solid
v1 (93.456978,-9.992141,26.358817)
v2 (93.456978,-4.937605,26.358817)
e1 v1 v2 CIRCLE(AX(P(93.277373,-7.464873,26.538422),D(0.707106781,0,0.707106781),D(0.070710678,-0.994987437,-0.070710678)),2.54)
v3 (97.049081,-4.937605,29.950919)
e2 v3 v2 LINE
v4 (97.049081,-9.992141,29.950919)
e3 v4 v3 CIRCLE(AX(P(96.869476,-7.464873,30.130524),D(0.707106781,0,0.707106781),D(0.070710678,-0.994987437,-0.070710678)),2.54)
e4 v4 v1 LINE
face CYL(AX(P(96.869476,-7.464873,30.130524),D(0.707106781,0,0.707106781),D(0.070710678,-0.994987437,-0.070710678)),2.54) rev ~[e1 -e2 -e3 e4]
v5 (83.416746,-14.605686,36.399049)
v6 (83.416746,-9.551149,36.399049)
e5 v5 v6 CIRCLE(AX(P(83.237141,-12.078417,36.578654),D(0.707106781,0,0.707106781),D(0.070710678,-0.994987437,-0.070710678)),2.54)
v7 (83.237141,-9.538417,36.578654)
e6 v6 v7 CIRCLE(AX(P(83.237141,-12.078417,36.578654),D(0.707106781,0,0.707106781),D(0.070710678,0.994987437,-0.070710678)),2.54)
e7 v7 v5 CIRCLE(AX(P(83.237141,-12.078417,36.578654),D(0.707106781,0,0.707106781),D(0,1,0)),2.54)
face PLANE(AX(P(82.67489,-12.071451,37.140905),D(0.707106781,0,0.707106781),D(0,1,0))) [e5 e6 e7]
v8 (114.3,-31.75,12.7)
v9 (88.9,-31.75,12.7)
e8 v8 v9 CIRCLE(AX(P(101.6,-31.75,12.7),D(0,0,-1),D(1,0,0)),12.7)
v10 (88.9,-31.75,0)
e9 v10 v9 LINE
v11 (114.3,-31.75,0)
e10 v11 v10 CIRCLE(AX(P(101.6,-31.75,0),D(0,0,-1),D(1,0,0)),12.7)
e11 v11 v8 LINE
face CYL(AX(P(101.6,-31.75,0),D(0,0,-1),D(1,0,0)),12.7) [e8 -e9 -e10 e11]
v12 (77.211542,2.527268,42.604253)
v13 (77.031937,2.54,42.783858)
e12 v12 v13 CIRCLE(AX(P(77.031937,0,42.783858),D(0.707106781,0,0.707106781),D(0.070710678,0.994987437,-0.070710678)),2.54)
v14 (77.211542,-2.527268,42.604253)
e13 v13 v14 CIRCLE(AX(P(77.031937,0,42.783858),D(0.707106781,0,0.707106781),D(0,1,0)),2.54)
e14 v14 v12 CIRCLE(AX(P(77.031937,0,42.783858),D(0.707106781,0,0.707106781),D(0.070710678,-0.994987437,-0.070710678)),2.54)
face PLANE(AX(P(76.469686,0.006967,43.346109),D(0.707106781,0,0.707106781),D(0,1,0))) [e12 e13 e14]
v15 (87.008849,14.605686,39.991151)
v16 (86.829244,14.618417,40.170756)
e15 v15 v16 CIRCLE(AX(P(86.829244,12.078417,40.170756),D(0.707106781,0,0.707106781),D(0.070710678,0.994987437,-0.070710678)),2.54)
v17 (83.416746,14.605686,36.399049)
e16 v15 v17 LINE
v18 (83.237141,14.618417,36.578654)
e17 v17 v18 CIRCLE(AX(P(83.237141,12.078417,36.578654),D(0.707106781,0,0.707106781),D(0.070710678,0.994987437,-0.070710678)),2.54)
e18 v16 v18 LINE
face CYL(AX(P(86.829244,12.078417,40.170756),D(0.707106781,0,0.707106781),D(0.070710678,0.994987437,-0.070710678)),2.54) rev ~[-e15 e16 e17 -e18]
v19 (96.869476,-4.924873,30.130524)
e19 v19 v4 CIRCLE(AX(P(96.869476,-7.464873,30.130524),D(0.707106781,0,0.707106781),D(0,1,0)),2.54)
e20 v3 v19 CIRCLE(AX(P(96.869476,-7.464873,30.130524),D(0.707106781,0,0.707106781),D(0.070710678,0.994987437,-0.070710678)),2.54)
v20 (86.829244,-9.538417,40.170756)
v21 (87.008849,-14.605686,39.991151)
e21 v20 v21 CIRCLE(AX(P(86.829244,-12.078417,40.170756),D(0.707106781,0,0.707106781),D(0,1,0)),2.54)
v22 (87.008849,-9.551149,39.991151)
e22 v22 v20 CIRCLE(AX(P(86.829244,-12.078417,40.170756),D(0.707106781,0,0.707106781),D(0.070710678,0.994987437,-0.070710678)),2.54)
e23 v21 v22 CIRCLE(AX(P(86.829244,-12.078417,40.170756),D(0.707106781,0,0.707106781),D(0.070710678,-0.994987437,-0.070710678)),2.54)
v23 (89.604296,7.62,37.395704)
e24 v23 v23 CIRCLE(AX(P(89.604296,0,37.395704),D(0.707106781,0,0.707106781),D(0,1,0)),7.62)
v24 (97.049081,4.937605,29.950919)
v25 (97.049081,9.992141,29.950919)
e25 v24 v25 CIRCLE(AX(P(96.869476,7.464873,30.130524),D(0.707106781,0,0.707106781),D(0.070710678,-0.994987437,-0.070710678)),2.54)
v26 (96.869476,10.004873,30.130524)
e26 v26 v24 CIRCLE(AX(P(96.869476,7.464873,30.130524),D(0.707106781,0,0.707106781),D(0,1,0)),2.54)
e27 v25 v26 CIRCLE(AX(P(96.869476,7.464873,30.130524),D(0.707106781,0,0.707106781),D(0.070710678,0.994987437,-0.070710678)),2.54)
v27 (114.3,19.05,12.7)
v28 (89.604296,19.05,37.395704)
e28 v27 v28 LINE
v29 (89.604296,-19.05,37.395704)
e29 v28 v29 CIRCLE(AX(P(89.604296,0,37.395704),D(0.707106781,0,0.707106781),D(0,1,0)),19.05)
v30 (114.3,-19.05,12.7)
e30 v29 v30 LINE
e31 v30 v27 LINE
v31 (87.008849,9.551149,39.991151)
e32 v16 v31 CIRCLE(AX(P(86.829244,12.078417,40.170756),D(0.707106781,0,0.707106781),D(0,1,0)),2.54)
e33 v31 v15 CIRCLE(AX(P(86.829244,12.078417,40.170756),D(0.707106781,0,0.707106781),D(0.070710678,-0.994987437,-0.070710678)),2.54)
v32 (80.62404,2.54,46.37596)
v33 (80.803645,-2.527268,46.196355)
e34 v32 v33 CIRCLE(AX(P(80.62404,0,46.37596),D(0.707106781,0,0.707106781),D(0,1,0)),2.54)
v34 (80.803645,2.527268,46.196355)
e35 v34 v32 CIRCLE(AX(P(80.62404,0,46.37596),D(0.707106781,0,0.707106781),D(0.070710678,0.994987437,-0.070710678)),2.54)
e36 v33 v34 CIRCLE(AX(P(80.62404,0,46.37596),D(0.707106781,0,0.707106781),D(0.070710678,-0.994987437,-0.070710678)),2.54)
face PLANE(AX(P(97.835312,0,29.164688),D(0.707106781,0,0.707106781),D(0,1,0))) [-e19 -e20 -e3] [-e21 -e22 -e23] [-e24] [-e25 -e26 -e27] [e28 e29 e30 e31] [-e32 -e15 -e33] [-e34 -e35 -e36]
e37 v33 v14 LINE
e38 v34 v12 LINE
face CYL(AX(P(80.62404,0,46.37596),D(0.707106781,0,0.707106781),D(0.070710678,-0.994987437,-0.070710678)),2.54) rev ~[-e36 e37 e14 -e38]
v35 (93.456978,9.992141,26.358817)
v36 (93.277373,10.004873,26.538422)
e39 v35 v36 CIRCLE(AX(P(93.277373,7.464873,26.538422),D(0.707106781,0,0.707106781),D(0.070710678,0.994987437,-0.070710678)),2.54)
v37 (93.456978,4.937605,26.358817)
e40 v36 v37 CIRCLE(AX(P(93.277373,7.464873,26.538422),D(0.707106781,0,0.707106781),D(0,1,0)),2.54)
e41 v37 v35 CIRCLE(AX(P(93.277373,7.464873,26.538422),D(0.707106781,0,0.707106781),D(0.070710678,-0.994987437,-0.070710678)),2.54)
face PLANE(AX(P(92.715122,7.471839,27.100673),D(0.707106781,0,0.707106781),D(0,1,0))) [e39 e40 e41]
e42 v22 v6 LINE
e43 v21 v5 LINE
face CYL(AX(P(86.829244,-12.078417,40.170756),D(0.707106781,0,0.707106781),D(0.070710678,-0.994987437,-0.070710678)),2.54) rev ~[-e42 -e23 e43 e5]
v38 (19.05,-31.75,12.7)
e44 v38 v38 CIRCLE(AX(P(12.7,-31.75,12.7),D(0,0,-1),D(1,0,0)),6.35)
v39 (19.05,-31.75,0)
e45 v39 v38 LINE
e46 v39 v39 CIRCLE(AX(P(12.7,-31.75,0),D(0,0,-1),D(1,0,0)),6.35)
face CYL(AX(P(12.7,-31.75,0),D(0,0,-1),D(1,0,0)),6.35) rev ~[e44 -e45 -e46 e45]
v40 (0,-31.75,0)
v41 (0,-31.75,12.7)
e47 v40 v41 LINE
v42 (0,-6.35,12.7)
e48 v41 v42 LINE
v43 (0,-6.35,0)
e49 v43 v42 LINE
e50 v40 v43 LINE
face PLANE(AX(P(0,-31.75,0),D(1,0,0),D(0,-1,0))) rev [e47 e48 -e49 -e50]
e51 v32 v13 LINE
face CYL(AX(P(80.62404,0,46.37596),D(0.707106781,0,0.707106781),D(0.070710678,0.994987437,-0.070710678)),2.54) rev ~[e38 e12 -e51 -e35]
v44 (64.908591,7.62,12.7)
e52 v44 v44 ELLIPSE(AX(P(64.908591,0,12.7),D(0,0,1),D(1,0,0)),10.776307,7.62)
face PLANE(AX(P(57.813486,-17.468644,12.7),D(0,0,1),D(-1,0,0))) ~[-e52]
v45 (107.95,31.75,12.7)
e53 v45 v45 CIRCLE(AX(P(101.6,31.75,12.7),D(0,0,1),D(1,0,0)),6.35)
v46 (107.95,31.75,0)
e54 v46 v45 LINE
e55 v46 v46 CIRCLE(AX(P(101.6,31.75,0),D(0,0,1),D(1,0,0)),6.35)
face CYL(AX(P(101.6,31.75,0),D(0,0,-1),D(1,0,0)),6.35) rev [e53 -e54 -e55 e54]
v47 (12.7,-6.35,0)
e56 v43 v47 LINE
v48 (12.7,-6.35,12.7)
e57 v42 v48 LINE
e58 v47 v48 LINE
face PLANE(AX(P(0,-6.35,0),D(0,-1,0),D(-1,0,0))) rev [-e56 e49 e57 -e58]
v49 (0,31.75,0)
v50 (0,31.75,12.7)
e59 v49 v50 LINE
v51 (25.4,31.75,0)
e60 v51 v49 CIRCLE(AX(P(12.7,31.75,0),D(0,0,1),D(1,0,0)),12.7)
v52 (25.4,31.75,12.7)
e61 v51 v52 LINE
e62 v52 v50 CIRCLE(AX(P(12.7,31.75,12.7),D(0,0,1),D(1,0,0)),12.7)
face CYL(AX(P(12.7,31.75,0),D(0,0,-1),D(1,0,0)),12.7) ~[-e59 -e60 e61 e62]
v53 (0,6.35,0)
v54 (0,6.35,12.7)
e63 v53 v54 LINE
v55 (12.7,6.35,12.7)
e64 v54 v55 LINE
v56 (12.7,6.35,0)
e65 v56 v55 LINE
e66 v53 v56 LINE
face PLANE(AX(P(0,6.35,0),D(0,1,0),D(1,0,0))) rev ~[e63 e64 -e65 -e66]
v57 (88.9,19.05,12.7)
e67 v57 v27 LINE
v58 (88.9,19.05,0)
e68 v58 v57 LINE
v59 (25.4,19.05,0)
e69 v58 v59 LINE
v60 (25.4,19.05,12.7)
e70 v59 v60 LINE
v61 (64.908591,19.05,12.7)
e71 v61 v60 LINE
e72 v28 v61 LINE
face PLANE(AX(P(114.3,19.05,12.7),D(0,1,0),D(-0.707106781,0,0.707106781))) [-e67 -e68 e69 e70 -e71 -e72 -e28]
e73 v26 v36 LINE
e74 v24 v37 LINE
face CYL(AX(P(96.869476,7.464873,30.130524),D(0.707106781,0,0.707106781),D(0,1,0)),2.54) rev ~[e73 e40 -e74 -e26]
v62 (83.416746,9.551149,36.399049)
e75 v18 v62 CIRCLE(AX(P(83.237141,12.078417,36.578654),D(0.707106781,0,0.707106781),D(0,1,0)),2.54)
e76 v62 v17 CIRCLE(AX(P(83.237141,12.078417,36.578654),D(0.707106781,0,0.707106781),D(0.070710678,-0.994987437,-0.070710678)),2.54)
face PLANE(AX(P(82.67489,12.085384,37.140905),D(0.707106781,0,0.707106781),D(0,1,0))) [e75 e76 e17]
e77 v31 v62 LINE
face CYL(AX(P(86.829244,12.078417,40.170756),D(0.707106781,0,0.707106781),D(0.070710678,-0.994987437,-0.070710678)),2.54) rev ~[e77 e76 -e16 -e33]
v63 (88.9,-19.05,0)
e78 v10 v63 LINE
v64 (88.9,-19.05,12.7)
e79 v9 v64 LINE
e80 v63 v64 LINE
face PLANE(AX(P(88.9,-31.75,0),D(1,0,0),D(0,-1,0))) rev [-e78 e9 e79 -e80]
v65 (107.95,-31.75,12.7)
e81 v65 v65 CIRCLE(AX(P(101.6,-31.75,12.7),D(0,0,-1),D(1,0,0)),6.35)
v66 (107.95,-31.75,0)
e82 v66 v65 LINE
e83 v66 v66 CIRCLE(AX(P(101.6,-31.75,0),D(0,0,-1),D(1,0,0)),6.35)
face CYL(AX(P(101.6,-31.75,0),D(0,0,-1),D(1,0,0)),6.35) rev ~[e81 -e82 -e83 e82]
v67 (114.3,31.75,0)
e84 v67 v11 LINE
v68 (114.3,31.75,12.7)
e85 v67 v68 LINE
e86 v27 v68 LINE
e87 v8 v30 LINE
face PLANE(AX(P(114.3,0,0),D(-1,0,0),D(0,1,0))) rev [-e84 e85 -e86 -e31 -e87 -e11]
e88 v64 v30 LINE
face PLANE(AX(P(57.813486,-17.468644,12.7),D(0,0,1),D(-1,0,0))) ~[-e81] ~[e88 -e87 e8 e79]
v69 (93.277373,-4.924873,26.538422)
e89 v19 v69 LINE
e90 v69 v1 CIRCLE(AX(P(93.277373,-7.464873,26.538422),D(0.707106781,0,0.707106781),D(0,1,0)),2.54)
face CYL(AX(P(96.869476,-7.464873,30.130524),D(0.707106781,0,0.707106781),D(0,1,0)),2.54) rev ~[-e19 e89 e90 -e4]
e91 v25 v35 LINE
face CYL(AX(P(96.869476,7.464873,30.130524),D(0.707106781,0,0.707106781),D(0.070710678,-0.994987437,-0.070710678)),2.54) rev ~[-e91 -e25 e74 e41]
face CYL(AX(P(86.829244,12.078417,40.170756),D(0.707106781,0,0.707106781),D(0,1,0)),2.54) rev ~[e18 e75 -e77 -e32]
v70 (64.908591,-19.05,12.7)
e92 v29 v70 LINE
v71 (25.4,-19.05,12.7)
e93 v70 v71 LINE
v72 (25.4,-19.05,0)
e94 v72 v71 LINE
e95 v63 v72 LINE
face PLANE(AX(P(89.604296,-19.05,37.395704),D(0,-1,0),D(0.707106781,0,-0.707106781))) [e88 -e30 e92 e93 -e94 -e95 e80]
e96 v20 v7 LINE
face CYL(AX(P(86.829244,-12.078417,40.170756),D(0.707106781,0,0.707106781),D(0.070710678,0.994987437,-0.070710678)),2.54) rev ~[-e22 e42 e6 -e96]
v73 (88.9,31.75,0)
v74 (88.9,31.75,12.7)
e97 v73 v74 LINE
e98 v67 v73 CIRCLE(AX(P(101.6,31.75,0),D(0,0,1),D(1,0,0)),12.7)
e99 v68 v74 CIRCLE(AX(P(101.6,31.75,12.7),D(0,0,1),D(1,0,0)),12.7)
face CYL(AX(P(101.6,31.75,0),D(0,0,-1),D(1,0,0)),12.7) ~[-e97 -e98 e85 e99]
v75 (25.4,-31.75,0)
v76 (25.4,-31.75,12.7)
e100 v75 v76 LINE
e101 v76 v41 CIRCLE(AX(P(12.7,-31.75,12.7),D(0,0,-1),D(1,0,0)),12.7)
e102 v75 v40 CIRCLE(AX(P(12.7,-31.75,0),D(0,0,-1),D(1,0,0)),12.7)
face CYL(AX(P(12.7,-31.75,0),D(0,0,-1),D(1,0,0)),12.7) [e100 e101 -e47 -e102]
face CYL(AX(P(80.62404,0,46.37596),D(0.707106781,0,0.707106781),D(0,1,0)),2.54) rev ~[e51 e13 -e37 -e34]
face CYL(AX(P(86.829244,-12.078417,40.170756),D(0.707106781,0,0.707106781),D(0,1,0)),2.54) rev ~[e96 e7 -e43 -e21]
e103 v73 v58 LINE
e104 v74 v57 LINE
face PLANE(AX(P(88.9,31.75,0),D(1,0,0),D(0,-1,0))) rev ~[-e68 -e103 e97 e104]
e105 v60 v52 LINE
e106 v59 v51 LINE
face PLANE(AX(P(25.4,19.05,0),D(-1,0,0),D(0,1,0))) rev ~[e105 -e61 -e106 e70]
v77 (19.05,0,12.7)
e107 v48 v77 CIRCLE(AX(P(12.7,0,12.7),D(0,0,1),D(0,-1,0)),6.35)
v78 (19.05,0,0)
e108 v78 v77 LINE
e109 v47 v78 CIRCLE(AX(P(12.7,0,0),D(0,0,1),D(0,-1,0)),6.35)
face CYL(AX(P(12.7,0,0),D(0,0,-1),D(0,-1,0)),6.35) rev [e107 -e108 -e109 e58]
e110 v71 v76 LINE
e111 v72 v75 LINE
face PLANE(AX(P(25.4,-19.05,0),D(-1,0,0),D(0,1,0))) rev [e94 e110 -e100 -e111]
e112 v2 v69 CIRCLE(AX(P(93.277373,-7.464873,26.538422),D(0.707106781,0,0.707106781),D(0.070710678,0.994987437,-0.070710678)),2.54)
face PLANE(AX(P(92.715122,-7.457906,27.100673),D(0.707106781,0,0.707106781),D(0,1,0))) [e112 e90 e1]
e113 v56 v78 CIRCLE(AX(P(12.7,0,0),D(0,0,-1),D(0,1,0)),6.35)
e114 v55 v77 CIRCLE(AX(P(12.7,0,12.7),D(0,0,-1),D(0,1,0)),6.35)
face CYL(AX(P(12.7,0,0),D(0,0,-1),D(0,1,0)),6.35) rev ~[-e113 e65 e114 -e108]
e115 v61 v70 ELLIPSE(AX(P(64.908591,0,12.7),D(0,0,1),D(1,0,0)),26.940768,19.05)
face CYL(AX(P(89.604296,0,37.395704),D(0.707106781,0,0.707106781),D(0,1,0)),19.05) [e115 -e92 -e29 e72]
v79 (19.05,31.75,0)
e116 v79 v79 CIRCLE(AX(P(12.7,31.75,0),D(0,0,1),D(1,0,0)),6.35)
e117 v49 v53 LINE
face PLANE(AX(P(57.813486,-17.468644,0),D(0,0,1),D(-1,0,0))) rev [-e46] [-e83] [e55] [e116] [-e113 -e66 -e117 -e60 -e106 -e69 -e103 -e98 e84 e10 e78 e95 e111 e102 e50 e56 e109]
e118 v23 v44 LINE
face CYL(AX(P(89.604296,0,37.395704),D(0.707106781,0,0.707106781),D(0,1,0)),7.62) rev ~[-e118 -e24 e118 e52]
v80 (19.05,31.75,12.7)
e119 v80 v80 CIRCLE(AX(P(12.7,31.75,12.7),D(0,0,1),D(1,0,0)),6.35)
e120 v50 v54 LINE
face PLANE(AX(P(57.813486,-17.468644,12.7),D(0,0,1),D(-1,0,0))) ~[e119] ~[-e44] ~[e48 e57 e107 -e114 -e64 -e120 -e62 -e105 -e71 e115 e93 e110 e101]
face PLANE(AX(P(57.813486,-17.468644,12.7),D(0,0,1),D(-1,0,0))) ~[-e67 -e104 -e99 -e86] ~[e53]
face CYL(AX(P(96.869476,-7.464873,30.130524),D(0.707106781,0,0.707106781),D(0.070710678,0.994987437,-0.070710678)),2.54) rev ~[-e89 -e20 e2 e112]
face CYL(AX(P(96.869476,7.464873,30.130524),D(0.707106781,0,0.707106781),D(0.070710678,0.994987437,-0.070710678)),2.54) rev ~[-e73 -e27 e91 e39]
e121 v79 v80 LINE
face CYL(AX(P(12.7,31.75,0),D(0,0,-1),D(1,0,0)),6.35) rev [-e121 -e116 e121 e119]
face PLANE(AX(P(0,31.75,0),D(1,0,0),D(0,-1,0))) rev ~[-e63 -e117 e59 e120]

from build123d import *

# Parameters (mm, degrees)
F0_R             = 6.35
F1_DEPTH         = 12.7
F4_R             = 7.62
F6_DEPTH         = 5.08
F6_COPIES_COUNT  = 2
F6_COPIES_PITCH  = 14.929745
F6_COPIES1_COUNT = 2
F6_COPIES1_PITCH = 14.929745
F6_COPIES2_COUNT = 2
F6_COPIES2_PITCH = 24.156836
F6_COPIES3_COUNT = 2
F6_COPIES3_PITCH = 24.156836


# Not quite as in the source:
# - a pattern or mirror of a feature is missing from the dataset's text; its kind, count and spacing are read off the source's solid


with BuildPart() as f1:
    # F0 (on Top) → F1 (new body)
    with BuildSketch(Plane.XY):
        with BuildLine():
            Line((0, 31.75), (0, 6.35))
            Line((0, 6.35), (12.7, 6.35))
            ThreePointArc((12.7, 6.35), (17.1901280605, 4.4901280605), (19.05, 0))
            Line((19.05, 0), (114.3, 0))
            Line((114.3, 0), (114.3, 31.75))
            ThreePointArc((114.3, 31.75), (101.6, 44.45), (88.9, 31.75))
            Line((88.9, 31.75), (88.9, 19.05))
            Line((88.9, 19.05), (25.4, 19.05))
            Line((25.4, 19.05), (25.4, 31.75))
            ThreePointArc((25.4, 31.75), (12.7, 44.45), (0, 31.75))
        make_face()
        with Locations((12.7, 31.75)):
            Circle(F0_R, mode=Mode.SUBTRACT)
        with Locations((101.6, 31.75)):
            Circle(F0_R, mode=Mode.SUBTRACT)
    extrude(amount=F1_DEPTH)

    # F2: F1 across plane


with BuildPart() as f1_1:
    add(f1.part)
    add(f1.part.mirror(Plane.XZ))

    # F4 (on face) → F5 (join, up to the next surface of F1)
    with BuildSketch(Plane(origin=(63.5, 0, 63.5), x_dir=(0, 1, 0), z_dir=(0.7071067812, 0, 0.7071067812))):
        with BuildLine():
            Line((-19.05, -36.9170489686), (-19.05, -71.8420489686))
            Line((-19.05, -71.8420489686), (19.05, -71.8420489686))
            Line((19.05, -71.8420489686), (19.05, -36.9170489686))
            ThreePointArc((19.05, -36.9170489686), (0, -17.8670489686), (-19.05, -36.9170489686))
        make_face()
        with BuildLine():
            ThreePointArc((-2.5272680903, -24.4710489686), (-0.1271594487, -21.6802339429), (2.54, -24.2170489686))
            ThreePointArc((2.54, -24.2170489686), (2.5368150257, -24.3442084172), (2.5272680903, -24.4710489686))
            ThreePointArc((2.5272680903, -24.4710489686), (9.8332676346, -28.8798325582), (12.7, -36.9170489686))
            ThreePointArc((12.7, -36.9170489686), (-8.0372164104, -46.7503166031), (-2.5272680903, -24.4710489686))
        make_face(mode=Mode.SUBTRACT)
        with BuildLine():
            ThreePointArc((2.5272680903, -24.4710489686), (0, -26.7570489686), (-2.5272680903, -24.4710489686))
            ThreePointArc((-2.5272680903, -24.4710489686), (-8.0372164104, -46.7503166031), (12.7, -36.9170489686))
            ThreePointArc((12.7, -36.9170489686), (9.8332676346, -28.8798325582), (2.5272680903, -24.4710489686))
        make_face()
        with Locations((0, -36.9170489686)):
            Circle(F4_R, mode=Mode.SUBTRACT)
        with BuildLine():
            ThreePointArc((2.5272680903, -24.4710489686), (2.5368150257, -24.3442084172), (2.54, -24.2170489686))
            ThreePointArc((2.54, -24.2170489686), (-0.1271594487, -21.6802339429), (-2.5272680903, -24.4710489686))
            ThreePointArc((-2.5272680903, -24.4710489686), (0, -24.2170489686), (2.5272680903, -24.4710489686))
        make_face()
        with BuildLine():
            ThreePointArc((2.5272680903, -24.4710489686), (0, -24.2170489686), (-2.5272680903, -24.4710489686))
            ThreePointArc((-2.5272680903, -24.4710489686), (0, -26.7570489686), (2.5272680903, -24.4710489686))
        make_face()
    extrude(until=Until.NEXT, dir=(-0.7071067812, 0, -0.7071067812))

    # F4 (on face) → F6 (cut)
    with BuildSketch(Plane(origin=(63.5, 0, 63.5), x_dir=(0, 1, 0), z_dir=(0.7071067812, 0, 0.7071067812))):
        with BuildLine():
            ThreePointArc((2.5272680903, -24.4710489686), (2.5368150257, -24.3442084172), (2.54, -24.2170489686))
            ThreePointArc((2.54, -24.2170489686), (-0.1271594487, -21.6802339429), (-2.5272680903, -24.4710489686))
            ThreePointArc((-2.5272680903, -24.4710489686), (0, -24.2170489686), (2.5272680903, -24.4710489686))
        make_face()
        with BuildLine():
            ThreePointArc((2.5272680903, -24.4710489686), (0, -24.2170489686), (-2.5272680903, -24.4710489686))
            ThreePointArc((-2.5272680903, -24.4710489686), (0, -26.7570489686), (2.5272680903, -24.4710489686))
        make_face()
    f6 = extrude(amount=-F6_DEPTH, mode=Mode.SUBTRACT)

    # F6_copies: F6 ×2
    with Locations(*[Vector(0.4156269378, 0.8090169944, -0.4156269378) * (i * F6_COPIES_PITCH) for i in range(1, F6_COPIES_COUNT)]):
        add(f6, mode=Mode.SUBTRACT)

    # F6_copies1: F6 ×2
    with Locations(*[Vector(0.4156269378, -0.8090169944, -0.4156269378) * (i * F6_COPIES1_PITCH) for i in range(1, F6_COPIES1_COUNT)]):
        add(f6, mode=Mode.SUBTRACT)

    # F6_copies2: F6 ×2
    with Locations(*[Vector(0.672498512, -0.3090169944, -0.672498512) * (i * F6_COPIES2_PITCH) for i in range(1, F6_COPIES2_COUNT)]):
        add(f6, mode=Mode.SUBTRACT)

    # F6_copies3: F6 ×2
    with Locations(*[Vector(0.672498512, 0.3090169944, -0.672498512) * (i * F6_COPIES3_PITCH) for i in range(1, F6_COPIES3_COUNT)]):
        add(f6, mode=Mode.SUBTRACT)


solid = f1_1.part
